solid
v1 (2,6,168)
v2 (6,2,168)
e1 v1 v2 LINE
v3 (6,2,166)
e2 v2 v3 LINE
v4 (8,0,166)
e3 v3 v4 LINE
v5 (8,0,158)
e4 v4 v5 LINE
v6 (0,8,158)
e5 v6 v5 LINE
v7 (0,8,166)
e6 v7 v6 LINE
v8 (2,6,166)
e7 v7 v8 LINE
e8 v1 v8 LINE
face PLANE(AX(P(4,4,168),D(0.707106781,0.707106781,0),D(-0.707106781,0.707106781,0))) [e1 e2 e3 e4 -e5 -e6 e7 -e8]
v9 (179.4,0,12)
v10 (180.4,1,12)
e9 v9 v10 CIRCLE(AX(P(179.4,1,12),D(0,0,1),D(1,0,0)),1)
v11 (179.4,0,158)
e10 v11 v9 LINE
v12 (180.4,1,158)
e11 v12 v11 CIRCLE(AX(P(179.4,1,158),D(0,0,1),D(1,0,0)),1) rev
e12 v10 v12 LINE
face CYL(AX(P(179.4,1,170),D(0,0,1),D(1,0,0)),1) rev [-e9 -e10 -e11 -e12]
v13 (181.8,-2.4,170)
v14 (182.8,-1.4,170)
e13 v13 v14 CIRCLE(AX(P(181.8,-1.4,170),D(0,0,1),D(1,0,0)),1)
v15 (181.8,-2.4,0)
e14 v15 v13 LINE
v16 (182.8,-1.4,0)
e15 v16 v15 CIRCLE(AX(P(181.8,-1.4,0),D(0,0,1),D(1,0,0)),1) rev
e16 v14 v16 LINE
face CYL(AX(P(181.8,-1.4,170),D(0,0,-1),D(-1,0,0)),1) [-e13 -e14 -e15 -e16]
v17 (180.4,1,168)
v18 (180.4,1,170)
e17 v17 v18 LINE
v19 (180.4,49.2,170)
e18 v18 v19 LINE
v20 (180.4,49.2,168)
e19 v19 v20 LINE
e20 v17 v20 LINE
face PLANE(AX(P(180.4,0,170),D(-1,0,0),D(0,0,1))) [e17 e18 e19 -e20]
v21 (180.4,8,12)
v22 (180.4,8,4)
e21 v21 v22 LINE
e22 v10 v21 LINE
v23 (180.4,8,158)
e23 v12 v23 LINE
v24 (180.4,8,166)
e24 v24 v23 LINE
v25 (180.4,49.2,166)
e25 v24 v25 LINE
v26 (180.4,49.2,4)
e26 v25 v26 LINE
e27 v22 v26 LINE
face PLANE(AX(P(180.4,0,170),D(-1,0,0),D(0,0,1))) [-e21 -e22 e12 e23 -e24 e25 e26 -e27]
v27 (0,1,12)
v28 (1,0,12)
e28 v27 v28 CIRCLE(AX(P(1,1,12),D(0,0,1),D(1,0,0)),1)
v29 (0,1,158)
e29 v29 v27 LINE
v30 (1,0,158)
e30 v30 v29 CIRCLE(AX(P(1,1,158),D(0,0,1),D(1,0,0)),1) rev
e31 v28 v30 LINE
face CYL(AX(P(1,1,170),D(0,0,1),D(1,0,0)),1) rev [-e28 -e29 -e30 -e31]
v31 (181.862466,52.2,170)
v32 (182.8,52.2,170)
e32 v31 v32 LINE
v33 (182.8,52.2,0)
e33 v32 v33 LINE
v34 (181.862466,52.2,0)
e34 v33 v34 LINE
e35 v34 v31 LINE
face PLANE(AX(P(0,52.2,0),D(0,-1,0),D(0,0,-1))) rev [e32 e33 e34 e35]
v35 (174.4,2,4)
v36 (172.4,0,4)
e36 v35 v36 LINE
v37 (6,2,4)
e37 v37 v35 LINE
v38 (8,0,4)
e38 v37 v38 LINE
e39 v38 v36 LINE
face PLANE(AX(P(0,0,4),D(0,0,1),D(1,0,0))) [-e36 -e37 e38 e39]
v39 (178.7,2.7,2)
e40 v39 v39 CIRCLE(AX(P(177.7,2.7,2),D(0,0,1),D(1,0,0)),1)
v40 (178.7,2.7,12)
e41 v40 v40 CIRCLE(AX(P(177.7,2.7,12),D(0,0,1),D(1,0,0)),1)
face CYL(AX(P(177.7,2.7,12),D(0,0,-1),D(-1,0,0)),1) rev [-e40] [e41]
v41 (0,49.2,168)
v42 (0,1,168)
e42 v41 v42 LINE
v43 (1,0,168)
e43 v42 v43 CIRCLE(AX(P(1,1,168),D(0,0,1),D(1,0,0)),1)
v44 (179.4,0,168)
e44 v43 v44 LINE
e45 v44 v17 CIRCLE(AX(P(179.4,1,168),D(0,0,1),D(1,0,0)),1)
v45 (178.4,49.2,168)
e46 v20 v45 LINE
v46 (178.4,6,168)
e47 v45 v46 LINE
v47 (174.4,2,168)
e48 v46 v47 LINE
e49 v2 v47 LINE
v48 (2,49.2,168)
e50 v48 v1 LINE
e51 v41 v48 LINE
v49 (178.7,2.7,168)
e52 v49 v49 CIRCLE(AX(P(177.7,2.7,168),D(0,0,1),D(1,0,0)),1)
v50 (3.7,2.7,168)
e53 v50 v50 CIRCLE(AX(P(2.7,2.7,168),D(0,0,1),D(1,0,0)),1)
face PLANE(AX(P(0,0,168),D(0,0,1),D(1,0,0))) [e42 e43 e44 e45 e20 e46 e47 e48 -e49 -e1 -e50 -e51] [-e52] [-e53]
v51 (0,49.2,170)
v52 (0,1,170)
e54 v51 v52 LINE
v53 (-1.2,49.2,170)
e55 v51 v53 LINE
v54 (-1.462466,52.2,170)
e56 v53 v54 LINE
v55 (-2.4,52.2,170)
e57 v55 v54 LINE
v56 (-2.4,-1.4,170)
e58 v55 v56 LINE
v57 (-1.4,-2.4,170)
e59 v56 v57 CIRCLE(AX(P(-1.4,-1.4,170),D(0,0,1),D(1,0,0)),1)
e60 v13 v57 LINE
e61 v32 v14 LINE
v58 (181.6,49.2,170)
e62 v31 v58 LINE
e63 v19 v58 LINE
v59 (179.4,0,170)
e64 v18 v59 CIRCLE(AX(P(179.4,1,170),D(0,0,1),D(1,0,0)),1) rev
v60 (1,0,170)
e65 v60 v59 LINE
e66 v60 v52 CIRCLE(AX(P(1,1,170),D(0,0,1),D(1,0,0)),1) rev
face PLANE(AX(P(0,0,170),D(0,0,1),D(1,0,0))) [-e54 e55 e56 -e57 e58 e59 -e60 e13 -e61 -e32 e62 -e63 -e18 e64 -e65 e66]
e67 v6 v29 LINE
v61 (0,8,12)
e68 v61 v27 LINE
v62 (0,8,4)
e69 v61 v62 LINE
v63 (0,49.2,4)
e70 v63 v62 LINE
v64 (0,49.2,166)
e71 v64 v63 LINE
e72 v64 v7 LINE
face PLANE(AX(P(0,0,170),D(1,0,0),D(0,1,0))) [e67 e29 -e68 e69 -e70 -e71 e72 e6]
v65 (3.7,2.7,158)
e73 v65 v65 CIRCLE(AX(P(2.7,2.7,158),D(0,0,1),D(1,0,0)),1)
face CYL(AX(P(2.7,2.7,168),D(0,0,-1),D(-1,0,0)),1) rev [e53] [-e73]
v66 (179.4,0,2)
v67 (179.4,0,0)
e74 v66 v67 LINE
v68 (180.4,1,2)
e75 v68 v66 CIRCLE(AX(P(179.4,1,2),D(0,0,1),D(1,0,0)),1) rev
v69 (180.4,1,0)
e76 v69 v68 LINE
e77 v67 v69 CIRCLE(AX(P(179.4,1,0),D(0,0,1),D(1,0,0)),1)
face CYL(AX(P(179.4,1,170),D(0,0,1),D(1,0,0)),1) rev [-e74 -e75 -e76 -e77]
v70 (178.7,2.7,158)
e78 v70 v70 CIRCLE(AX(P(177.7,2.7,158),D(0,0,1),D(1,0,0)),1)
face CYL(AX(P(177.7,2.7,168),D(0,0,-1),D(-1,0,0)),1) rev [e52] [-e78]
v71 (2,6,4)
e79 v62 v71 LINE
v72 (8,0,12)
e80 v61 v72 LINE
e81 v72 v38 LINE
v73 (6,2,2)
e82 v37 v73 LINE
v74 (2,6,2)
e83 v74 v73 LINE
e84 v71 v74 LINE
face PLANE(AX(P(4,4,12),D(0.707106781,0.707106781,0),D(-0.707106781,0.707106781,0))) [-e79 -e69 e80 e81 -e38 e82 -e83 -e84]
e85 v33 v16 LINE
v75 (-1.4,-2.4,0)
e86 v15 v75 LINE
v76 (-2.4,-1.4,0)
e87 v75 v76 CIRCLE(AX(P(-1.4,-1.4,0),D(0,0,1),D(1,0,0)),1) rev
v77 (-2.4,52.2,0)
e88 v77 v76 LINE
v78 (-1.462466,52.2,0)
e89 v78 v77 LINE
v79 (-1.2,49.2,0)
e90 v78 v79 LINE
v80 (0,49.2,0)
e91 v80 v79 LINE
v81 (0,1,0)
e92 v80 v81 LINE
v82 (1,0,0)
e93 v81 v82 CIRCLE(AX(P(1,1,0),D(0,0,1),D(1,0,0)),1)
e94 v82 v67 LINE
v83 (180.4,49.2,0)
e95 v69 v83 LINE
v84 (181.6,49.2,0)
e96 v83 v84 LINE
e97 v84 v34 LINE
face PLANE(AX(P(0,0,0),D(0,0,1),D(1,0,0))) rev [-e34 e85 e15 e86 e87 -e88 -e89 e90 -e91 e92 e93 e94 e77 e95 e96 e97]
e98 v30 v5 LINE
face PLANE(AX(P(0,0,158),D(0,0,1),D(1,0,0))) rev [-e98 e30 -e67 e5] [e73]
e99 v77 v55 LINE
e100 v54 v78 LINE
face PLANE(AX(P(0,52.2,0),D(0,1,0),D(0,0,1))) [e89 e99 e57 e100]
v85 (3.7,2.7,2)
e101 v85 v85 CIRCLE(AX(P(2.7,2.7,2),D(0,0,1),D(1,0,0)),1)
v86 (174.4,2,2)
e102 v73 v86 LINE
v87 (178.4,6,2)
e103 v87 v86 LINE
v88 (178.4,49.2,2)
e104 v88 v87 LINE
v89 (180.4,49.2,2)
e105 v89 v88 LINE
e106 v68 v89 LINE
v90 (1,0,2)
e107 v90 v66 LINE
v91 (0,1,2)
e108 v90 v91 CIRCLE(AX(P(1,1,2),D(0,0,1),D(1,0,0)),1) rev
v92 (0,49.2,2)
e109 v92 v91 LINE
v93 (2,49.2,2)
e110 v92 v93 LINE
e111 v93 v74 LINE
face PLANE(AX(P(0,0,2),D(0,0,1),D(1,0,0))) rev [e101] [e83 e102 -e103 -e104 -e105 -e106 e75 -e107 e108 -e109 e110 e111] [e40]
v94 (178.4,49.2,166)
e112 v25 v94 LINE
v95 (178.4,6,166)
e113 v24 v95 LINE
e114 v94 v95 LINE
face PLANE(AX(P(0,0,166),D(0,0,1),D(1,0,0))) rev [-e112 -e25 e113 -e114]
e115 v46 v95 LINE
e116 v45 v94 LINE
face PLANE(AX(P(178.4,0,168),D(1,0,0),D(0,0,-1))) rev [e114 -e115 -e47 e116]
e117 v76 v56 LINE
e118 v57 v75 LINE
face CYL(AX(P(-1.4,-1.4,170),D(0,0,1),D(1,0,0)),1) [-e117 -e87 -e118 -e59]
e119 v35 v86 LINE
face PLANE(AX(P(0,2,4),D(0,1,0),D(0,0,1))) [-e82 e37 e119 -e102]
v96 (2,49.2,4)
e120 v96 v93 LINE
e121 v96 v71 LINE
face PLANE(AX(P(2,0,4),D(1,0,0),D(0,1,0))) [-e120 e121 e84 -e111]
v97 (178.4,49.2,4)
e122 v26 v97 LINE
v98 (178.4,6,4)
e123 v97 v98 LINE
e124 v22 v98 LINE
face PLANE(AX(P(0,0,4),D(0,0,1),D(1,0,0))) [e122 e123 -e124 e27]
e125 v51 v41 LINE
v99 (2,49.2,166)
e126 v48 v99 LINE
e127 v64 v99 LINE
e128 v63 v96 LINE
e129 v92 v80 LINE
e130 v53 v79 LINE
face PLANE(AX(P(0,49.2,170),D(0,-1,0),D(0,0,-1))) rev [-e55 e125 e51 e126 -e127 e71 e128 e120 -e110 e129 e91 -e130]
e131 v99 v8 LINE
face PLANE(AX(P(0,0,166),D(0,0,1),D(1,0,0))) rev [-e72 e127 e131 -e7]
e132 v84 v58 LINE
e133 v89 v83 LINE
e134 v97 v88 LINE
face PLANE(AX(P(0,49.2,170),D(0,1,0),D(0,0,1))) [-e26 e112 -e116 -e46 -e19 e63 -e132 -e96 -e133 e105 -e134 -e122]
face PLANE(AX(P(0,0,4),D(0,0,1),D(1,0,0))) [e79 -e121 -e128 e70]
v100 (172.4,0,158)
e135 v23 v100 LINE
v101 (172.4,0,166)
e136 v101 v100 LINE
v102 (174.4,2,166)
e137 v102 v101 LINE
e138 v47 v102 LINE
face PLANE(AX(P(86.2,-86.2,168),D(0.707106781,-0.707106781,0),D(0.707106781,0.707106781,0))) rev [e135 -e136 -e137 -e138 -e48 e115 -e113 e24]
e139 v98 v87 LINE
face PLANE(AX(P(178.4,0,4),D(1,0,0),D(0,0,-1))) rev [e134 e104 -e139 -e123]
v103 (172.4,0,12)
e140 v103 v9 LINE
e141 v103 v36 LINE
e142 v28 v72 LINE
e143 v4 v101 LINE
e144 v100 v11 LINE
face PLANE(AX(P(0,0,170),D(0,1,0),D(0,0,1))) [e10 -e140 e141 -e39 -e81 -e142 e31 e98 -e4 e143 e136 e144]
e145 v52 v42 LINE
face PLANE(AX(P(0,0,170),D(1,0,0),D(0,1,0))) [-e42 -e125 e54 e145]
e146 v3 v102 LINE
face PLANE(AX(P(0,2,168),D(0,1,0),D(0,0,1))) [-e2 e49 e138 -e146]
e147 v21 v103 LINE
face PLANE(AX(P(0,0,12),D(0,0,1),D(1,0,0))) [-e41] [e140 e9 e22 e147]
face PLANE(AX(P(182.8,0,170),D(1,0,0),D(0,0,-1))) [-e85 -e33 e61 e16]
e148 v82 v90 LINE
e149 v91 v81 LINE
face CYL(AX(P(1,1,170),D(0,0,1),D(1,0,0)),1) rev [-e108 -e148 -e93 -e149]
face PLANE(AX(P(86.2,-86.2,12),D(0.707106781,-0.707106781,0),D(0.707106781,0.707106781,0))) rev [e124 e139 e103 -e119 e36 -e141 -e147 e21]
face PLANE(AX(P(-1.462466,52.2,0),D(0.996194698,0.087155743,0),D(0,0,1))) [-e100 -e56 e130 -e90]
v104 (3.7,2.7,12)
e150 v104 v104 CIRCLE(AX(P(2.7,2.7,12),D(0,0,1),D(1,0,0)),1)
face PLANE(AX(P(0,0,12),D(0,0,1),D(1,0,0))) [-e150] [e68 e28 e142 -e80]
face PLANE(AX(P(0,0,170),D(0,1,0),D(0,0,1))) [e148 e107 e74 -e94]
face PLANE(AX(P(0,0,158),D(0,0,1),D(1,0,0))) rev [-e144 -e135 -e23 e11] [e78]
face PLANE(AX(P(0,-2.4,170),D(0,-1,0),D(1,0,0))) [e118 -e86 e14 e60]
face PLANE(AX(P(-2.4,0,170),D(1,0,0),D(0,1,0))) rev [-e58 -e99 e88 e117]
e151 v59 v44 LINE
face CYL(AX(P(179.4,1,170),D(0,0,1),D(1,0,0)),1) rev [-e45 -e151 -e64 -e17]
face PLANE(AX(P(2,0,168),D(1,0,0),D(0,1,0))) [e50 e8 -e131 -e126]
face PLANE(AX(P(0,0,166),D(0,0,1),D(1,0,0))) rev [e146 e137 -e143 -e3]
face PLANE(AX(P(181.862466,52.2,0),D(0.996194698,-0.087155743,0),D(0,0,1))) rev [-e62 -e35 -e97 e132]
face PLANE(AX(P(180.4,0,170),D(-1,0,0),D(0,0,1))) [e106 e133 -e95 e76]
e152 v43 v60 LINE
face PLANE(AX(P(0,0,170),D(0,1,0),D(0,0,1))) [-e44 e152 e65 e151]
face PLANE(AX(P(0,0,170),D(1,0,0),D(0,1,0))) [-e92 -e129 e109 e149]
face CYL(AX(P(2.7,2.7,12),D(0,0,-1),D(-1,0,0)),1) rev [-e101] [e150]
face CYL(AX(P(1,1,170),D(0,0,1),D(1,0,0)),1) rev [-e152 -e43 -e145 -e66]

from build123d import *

# Parameters (mm, degrees)
EXTRUDE_1_DEPTH = 170
EXTRUDE_START   = 2
SKETCH_1_3_R    = 1
EXTRUDE_2_DEPTH = 10
EXTRUDE_3_DEPTH = 2
FILLET_1_R      = 1
EXTRUDE_START_2 = 158
SKETCH_1_5_R    = 1
EXTRUDE_4_DEPTH = 10
EXTRUDE_START_3 = 166
EXTRUDE_5_DEPTH = 2
FILLET_2_R      = 1
SKETCH_2_W      = 1.2
SKETCH_2_H      = 170
EXTRUDE_6_DEPTH = 3
CHAMFER_1_SIZE2 = 3
CHAMFER_1_SIZE  = 0.262465991
CHAMFER_2_SIZE2 = 0.262465991
CHAMFER_2_SIZE  = 3
FILLET_3_R      = 1


with BuildPart() as part:
    # Эскиз1 → Бобышка-Вытянуть1 (new body)
    with BuildSketch(Plane.XY):
        Polygon((0, 49.2), (-2.4, 49.2), (-2.4, -2.4), (182.8, -2.4), (182.8, 49.2), (180.4, 49.2), (180.4, 0), (0, 0), align=None)
    extrude(amount=EXTRUDE_1_DEPTH)

    # Эскиз1<3> → Бобышка-Вытянуть2 (add)
    # profile 1 of 2: a face of its own
    with BuildSketch(Plane.XY.offset(EXTRUDE_START)):
        Polygon((2, 6), (0, 8), (0, 0), (8, 0), (6, 2), align=None)
        with Locations((2.7, 2.7)):
            Circle(SKETCH_1_3_R, mode=Mode.SUBTRACT)
    # profile 2 of 2: a face of its own
    with BuildSketch(Plane.XY.offset(EXTRUDE_START)):
        Polygon((174.4, 2), (172.4, 0), (180.4, 0), (180.4, 8), (178.4, 6), align=None)
        with Locations((177.7, 2.7)):
            Circle(SKETCH_1_3_R, mode=Mode.SUBTRACT)
    extrude(amount=EXTRUDE_2_DEPTH)

    # Эскиз1<4> → Бобышка-Вытянуть3 (add)
    with BuildSketch(Plane.XY.offset(EXTRUDE_START)):
        Polygon((178.4, 49.2), (178.4, 6), (180.4, 8), (180.4, 49.2), align=None)
        Polygon((6, 2), (8, 0), (172.4, 0), (174.4, 2), align=None)
        Polygon((2, 49.2), (0, 49.2), (0, 8), (2, 6), align=None)
    extrude(amount=EXTRUDE_3_DEPTH)

    # Скругление1
    fillet_1_edges = [part.edges().sort_by_distance(p)[0] for p in [
        (182.8, -2.4, 85),
        (-2.4, -2.4, 85),
        (0, 0, 1),
        (180.4, 0, 1),
    ]]
    fillet(fillet_1_edges, radius=FILLET_1_R)

    # Эскиз1<5> → Бобышка-Вытянуть4 (add)
    # profile 1 of 2: a face of its own
    with BuildSketch(Plane.XY.offset(EXTRUDE_START_2)):
        Polygon((174.4, 2), (172.4, 0), (180.4, 0), (180.4, 8), (178.4, 6), align=None)
        with Locations((177.7, 2.7)):
            Circle(SKETCH_1_5_R, mode=Mode.SUBTRACT)
    # profile 2 of 2: a face of its own
    with BuildSketch(Plane.XY.offset(EXTRUDE_START_2)):
        Polygon((2, 6), (0, 8), (0, 0), (8, 0), (6, 2), align=None)
        with Locations((2.7, 2.7)):
            Circle(SKETCH_1_5_R, mode=Mode.SUBTRACT)
    extrude(amount=EXTRUDE_4_DEPTH)

    # Эскиз1<6> → Бобышка-Вытянуть5 (add)
    with BuildSketch(Plane.XY.offset(EXTRUDE_START_3)):
        Polygon((178.4, 49.2), (178.4, 6), (180.4, 8), (180.4, 49.2), align=None)
        Polygon((6, 2), (8, 0), (172.4, 0), (174.4, 2), align=None)
        Polygon((2, 49.2), (0, 49.2), (0, 8), (2, 6), align=None)
    extrude(amount=EXTRUDE_5_DEPTH)

    # Скругление2
    fillet_2_edges = [part.edges().sort_by_distance(p)[0] for p in [
        (180.4, 0, 85),
        (0, 0, 85),
    ]]
    fillet(fillet_2_edges, radius=FILLET_2_R)

    # Эскиз2 → Бобышка-Вытянуть6 (add)
    with BuildSketch(Plane(origin=(0, 49.2, 0), x_dir=(1, 0, 0), z_dir=(0, 1, 0))):
        with Locations((-1.8, -85)):
            Rectangle(SKETCH_2_W, SKETCH_2_H)
        with Locations((182.2, -85)):
            Rectangle(SKETCH_2_W, SKETCH_2_H)
    extrude(amount=EXTRUDE_6_DEPTH)

    # Фаска1
    chamfer_1_edges = [part.edges().sort_by_distance(p)[0] for p in [
        (-1.2, 52.2, 85),
    ]]
    chamfer_1_side = [part.faces().sort_by_distance(p)[0] for p in [
        (-1.20524932, 52.2, 85),
    ]]
    chamfer(chamfer_1_edges, length=CHAMFER_1_SIZE - 0.0001, length2=CHAMFER_1_SIZE2 - 0.0001, reference=chamfer_1_side[0])  # a hair under: the kernel refuses the full size

    # Фаска2
    chamfer_2_edges = [part.edges().sort_by_distance(p)[0] for p in [
        (181.6, 52.2, 85),
    ]]
    chamfer_2_side = [part.faces().sort_by_distance(p)[0] for p in [
        (181.6, 52.19475068, 85),
    ]]
    chamfer(chamfer_2_edges, length=CHAMFER_2_SIZE - 0.0001, length2=CHAMFER_2_SIZE2 - 0.0001, reference=chamfer_2_side[0])  # a hair under: the kernel refuses the full size

    # Скругление3
    fillet_3_edges = [part.edges().sort_by_distance(p)[0] for p in [
        (0, 0, 169),
        (180.4, 0, 169),
    ]]
    fillet(fillet_3_edges, radius=FILLET_3_R)


solid = part.part
